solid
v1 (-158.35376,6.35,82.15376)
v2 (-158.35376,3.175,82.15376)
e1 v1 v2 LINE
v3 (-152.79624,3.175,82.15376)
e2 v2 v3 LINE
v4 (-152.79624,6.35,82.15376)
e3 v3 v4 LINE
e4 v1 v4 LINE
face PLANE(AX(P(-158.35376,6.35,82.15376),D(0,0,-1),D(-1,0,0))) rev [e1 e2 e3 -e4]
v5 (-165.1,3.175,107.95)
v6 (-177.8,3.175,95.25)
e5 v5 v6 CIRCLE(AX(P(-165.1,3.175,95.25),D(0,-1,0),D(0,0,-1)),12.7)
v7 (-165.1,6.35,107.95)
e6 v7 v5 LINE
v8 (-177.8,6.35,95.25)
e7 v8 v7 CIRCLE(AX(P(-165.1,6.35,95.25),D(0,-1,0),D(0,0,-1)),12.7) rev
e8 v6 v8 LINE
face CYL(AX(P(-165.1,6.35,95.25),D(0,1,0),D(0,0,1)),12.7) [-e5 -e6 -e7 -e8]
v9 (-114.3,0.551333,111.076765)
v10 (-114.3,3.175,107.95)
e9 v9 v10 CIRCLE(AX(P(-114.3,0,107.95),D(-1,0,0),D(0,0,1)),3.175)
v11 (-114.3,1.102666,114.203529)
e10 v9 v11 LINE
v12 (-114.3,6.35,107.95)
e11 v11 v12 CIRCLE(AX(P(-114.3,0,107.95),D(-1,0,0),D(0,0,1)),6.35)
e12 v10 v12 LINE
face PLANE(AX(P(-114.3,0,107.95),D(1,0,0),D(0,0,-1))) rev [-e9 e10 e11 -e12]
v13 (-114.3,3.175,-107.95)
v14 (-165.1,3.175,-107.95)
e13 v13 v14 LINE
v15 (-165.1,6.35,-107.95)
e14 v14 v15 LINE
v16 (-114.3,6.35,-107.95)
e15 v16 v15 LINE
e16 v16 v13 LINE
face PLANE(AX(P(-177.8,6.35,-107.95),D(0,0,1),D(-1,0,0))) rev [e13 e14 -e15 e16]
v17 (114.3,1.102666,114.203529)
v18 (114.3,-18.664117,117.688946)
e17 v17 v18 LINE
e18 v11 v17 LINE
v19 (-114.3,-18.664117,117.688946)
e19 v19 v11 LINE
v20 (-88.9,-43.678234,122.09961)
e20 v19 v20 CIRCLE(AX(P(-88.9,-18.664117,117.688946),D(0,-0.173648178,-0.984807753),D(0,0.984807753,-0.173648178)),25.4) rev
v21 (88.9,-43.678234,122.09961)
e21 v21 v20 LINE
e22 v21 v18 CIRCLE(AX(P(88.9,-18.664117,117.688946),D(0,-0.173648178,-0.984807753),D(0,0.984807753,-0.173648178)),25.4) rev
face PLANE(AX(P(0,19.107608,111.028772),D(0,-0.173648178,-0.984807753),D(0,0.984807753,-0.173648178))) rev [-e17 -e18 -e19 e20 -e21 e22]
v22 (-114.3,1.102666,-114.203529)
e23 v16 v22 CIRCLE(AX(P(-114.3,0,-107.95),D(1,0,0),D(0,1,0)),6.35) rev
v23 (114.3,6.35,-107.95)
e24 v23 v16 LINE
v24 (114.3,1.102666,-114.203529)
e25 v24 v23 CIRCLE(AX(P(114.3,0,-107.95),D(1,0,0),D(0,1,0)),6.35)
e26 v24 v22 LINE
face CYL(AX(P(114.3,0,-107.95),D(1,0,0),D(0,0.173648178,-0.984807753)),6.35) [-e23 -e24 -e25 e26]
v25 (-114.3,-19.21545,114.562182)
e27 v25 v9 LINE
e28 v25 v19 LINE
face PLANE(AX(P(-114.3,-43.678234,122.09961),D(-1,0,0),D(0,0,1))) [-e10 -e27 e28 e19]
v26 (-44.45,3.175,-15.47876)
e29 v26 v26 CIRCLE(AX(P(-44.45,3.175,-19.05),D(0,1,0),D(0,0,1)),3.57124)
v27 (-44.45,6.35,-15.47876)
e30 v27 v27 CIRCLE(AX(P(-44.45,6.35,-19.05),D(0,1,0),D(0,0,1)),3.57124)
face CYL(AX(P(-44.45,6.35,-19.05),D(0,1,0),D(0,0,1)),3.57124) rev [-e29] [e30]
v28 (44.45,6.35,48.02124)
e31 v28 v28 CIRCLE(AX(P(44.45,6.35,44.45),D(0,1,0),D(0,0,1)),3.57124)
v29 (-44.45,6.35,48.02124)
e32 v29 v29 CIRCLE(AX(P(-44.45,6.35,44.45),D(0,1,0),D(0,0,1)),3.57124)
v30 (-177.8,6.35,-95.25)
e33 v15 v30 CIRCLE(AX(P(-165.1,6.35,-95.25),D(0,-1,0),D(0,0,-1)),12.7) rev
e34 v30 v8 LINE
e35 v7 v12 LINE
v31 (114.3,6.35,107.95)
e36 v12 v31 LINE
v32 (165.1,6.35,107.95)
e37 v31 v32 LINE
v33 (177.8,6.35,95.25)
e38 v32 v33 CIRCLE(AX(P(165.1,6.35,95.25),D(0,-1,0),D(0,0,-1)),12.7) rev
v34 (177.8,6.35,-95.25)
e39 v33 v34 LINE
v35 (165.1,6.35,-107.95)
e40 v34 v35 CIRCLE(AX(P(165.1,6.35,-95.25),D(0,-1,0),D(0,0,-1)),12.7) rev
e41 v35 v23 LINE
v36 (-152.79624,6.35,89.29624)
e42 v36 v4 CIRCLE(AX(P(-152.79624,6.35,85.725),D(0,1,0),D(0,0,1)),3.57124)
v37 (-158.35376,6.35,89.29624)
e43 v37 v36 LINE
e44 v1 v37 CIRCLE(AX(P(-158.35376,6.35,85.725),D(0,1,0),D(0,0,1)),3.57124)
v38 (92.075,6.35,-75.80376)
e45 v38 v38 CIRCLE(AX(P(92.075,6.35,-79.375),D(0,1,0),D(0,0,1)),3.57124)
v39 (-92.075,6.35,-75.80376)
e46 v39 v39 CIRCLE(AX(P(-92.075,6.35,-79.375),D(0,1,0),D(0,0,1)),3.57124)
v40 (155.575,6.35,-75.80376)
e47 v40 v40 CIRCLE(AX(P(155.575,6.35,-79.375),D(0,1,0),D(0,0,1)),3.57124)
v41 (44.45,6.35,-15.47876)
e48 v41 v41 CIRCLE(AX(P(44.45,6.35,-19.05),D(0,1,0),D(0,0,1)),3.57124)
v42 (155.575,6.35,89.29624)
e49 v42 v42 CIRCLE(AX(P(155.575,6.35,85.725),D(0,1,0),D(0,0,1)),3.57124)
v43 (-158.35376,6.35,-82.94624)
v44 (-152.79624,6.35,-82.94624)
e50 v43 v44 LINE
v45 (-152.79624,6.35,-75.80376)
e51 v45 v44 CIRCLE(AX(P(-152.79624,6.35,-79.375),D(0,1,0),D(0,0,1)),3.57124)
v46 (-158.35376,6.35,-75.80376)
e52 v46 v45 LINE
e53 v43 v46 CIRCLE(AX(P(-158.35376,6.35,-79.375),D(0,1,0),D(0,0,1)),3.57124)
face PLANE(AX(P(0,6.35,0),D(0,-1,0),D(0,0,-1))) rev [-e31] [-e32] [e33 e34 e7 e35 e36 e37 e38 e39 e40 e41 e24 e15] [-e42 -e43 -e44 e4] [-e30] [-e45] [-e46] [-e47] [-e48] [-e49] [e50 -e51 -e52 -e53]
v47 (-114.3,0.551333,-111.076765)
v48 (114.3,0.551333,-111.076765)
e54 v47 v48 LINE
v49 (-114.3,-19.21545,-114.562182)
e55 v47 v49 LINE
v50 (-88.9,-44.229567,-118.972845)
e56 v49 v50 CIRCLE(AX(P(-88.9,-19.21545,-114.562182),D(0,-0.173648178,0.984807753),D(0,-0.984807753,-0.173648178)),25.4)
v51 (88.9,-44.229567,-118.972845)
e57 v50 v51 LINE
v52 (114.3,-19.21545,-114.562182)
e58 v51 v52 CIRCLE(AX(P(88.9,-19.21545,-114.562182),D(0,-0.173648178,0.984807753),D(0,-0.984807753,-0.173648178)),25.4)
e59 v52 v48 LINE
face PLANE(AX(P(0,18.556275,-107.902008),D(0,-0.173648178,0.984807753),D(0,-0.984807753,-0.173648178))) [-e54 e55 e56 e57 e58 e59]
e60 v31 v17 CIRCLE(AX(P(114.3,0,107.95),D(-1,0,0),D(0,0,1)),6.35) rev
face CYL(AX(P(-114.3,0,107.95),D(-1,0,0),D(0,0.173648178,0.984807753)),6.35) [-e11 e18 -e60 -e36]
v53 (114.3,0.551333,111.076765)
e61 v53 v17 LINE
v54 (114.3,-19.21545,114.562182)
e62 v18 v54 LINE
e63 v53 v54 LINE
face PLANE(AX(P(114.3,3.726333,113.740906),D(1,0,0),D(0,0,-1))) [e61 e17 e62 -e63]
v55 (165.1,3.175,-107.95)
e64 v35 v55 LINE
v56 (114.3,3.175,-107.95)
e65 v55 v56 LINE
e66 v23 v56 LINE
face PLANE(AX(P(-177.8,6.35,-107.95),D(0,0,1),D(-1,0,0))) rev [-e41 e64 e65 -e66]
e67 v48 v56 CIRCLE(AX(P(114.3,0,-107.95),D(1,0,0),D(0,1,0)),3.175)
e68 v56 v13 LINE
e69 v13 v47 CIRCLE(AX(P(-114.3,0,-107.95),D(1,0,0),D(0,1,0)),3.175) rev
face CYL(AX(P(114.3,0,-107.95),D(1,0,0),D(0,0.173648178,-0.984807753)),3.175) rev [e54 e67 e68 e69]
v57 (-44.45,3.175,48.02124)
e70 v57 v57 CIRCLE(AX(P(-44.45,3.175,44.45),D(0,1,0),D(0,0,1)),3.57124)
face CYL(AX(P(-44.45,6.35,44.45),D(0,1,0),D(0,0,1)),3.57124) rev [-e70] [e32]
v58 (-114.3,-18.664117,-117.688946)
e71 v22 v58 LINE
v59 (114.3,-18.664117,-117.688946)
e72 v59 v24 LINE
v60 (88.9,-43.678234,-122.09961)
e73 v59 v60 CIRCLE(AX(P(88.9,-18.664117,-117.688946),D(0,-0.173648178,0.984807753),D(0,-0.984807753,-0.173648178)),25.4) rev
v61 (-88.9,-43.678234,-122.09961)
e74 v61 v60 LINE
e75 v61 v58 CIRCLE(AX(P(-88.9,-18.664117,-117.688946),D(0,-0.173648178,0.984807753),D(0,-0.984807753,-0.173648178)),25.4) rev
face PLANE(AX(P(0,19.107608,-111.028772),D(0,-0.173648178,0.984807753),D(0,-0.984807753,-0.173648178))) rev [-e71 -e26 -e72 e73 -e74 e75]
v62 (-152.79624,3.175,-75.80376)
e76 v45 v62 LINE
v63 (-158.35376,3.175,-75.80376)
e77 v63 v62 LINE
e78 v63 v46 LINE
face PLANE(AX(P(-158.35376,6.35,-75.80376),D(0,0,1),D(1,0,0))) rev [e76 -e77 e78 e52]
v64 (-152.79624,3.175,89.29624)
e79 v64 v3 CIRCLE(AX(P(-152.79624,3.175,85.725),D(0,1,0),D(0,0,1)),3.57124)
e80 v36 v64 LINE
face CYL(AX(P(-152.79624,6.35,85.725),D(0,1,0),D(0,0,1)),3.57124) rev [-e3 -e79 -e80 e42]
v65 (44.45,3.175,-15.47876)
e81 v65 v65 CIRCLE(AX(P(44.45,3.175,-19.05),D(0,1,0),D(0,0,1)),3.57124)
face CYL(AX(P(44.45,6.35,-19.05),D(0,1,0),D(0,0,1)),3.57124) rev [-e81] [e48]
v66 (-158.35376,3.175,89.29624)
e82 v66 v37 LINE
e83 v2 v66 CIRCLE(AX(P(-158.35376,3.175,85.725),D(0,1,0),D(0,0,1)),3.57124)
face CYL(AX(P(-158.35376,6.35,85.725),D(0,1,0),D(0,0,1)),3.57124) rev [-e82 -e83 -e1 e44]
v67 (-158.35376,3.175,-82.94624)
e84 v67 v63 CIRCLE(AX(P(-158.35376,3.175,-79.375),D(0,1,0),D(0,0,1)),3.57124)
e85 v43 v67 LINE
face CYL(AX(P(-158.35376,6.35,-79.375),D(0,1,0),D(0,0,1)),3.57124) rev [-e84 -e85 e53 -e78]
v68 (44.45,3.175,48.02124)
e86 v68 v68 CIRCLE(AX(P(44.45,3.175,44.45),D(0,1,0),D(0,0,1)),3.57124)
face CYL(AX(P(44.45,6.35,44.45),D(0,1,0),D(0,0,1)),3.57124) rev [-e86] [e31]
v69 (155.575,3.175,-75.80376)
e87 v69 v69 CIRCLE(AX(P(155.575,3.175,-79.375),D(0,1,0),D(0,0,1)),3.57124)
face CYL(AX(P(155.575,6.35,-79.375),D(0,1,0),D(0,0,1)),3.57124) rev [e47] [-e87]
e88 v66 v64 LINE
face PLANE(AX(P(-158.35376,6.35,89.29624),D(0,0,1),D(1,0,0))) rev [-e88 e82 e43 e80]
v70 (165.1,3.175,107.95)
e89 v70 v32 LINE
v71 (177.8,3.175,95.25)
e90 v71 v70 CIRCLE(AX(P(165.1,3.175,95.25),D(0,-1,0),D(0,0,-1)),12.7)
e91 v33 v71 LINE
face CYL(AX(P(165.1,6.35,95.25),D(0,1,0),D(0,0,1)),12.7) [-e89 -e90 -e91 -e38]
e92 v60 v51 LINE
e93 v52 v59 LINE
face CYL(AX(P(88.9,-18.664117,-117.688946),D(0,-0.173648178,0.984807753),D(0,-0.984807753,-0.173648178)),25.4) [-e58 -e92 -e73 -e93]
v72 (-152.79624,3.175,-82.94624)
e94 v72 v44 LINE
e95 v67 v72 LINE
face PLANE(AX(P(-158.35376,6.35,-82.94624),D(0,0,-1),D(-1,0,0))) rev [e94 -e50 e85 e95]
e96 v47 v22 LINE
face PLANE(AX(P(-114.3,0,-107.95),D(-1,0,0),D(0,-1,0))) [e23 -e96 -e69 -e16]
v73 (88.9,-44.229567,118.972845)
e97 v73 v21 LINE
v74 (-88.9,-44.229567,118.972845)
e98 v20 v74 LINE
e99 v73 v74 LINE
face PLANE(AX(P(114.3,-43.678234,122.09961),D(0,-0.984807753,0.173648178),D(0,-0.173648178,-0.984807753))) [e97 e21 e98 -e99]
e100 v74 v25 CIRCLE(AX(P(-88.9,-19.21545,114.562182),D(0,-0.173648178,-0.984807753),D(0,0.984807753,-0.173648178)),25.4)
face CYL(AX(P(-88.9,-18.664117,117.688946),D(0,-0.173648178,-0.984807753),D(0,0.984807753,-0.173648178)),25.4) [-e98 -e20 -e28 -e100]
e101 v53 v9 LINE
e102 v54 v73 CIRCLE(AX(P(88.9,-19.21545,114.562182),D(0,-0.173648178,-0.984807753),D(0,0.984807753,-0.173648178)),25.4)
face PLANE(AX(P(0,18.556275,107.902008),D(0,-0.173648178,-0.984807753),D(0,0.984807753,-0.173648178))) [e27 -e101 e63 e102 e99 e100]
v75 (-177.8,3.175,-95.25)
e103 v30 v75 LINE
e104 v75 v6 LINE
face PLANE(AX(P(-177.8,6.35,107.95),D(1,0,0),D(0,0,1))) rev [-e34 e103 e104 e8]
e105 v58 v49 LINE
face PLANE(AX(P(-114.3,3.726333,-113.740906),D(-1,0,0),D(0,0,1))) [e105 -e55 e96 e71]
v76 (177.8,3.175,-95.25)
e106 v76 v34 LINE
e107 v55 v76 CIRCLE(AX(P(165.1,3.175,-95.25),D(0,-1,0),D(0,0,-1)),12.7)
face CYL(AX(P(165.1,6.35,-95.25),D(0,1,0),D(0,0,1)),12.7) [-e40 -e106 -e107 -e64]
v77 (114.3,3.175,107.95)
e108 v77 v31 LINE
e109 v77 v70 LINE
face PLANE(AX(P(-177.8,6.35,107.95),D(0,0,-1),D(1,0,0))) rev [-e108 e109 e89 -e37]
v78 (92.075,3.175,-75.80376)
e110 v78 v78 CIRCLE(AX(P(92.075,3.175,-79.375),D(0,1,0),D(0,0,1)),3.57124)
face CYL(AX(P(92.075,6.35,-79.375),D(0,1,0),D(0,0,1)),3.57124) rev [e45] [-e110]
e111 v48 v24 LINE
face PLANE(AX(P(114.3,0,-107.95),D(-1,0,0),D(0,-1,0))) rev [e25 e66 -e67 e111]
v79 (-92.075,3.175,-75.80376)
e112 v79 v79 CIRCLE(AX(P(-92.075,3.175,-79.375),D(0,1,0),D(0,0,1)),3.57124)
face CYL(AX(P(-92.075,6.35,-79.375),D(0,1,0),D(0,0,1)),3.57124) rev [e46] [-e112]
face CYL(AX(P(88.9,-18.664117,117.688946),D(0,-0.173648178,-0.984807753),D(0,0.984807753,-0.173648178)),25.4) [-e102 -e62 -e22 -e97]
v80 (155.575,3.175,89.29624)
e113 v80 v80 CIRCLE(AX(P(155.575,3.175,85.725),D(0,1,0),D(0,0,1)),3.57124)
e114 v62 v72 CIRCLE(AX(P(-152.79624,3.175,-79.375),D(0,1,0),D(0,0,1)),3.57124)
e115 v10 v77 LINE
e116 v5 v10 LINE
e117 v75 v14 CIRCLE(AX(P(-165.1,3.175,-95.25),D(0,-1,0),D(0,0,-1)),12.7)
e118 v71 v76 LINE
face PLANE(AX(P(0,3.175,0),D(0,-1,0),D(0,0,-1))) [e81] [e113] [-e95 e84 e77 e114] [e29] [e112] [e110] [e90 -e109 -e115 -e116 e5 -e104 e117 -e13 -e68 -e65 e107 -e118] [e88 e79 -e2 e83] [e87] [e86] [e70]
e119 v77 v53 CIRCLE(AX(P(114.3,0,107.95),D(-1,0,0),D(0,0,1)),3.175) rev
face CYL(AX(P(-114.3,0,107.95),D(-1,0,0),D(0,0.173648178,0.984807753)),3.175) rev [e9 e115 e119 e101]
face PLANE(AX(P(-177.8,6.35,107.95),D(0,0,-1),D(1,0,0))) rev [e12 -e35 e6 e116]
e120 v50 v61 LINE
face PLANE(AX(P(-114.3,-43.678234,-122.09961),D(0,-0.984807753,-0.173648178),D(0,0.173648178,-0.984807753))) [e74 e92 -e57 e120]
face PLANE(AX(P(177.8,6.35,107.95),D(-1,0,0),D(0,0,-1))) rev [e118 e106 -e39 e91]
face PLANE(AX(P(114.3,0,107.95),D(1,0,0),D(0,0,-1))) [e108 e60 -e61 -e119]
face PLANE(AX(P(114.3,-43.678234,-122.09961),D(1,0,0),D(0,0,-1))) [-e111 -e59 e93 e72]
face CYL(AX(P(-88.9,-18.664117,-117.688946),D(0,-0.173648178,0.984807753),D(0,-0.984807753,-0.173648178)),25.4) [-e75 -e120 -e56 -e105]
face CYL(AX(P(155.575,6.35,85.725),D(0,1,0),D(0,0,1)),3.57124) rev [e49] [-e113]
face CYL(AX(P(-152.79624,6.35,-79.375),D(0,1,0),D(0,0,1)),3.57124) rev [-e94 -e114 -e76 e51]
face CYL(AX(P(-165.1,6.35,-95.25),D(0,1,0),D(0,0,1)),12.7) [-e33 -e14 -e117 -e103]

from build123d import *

# Parameters (mm, degrees)
SKETCH1_W                   = 355.6
SKETCH1_H                   = 215.9
BOSS_EXTRUDE1_DEPTH         = 6.35
CONVERT_SOLID1_OUTLINE_W    = 355.6
CONVERT_SOLID1_OUTLINE_H    = 215.9
CONVERT_SOLID1_DEPTH        = 3.175
F_1_4_CLEARANCE_HOLE1_D     = 7.14248
F_1_4_START                 = 3.175
F_1_4_CLEARANCE_SLOT1_DEPTH = 3.175
EDGE_FLANGE2_DEPTH          = 228.6
EDGE_FLANGE2_BEND_DEPTH     = 228.6
FILLET1_R                   = 12.7
FILLET2_R                   = 25.4


# Read off the part's stored shape, not the designer's step: Convert-Solid1, 1/4 Clearance Slot1
# Sheet-metal steps are written as plain solids
with BuildPart() as part:
    # Sketch1 → Boss-Extrude1 (new body)
    with BuildSketch(Plane(origin=(0, 0, 0), x_dir=(1, 0, 0), z_dir=(0, 1, 0))):
        Rectangle(SKETCH1_W, SKETCH1_H)
    extrude(amount=BOSS_EXTRUDE1_DEPTH)

    # Convert-Solid1 outline → Convert-Solid1 (cut)
    with BuildSketch(Plane(origin=(0, 0, 0), x_dir=(1, 0, 0), z_dir=(0, 1, 0))):
        Rectangle(CONVERT_SOLID1_OUTLINE_W, CONVERT_SOLID1_OUTLINE_H)
    extrude(amount=CONVERT_SOLID1_DEPTH, mode=Mode.SUBTRACT)

    # 1/4 Clearance Hole1 (through all)
    with Locations(Plane(origin=(0, 6.35, 0), x_dir=(1, 0, 0), z_dir=(0, 1, 0))):
        with Locations((-92.075, 79.375), (-44.45, 19.05), (44.45, 19.05), (-44.45, -44.45), (44.45, -44.45), (92.075, 79.375), (155.575, 79.375), (155.575, -85.725)):
            Hole(F_1_4_CLEARANCE_HOLE1_D / 2)

    # 1/4 Clearance Slot1 outline → 1/4 Clearance Slot1 (cut)
    with BuildSketch(Plane(origin=(0, 0, 0), x_dir=(1, 0, 0), z_dir=(0, 1, 0)).offset(F_1_4_START)):
        with BuildLine():
            Line((-158.35376, -89.29624), (-152.79624, -89.29624))
            ThreePointArc((-152.79624, -89.29624), (-149.225, -85.725), (-152.79624, -82.15376))
            Line((-152.79624, -82.15376), (-158.35376, -82.15376))
            ThreePointArc((-158.35376, -82.15376), (-161.925, -85.725), (-158.35376, -89.29624))
        make_face()
        with BuildLine():
            Line((-158.35376, 75.80376), (-152.79624, 75.80376))
            ThreePointArc((-152.79624, 75.80376), (-149.225, 79.375), (-152.79624, 82.94624))
            Line((-152.79624, 82.94624), (-158.35376, 82.94624))
            ThreePointArc((-158.35376, 82.94624), (-161.925, 79.375), (-158.35376, 75.80376))
        make_face()
    extrude(amount=F_1_4_CLEARANCE_SLOT1_DEPTH, mode=Mode.SUBTRACT)

    # Edge-Flange2 section (across the edge) → Edge-Flange2 (add)
    with BuildSketch(Plane(origin=(-114.3, 3.175, -110.614141329), x_dir=(0, -0.17364817766693427, 0.9848077530122075), z_dir=(1, 0, 0))):
        with BuildLine():
            Line((-3.175, 2.664141329), (-3.175, 48.135858671))
            Line((-3.175, 48.135858671), (0, 48.135858671))
            Line((0, 48.135858671), (0, 2.664141329))
            ThreePointArc((0, 2.664141329), (0.742808893, 0.623290668), (2.623667036, -0.462623287))
            Line((2.623667036, -0.462623287), (2.072334072, -3.589387903))
            ThreePointArc((2.072334072, -3.589387903), (-1.689382214, -1.417559993), (-3.175, 2.664141329))
        make_face()
    extrude(amount=EDGE_FLANGE2_DEPTH)

    # Edge-Flange2 section 2 (across the edge) → Edge-Flange2 bend (add)
    with BuildSketch(Plane(origin=(114.3, 3.175, 110.614141329), x_dir=(0, -0.17364817766693427, -0.9848077530122075), z_dir=(-1, 0, 0))):
        with BuildLine():
            Line((-3.175, 2.664141329), (-3.175, 48.135858671))
            Line((-3.175, 48.135858671), (0, 48.135858671))
            Line((0, 48.135858671), (0, 2.664141329))
            ThreePointArc((0, 2.664141329), (0.742808893, 0.623290668), (2.623667036, -0.462623287))
            Line((2.623667036, -0.462623287), (2.072334072, -3.589387903))
            ThreePointArc((2.072334072, -3.589387903), (-1.689382214, -1.417559993), (-3.175, 2.664141329))
        make_face()
    extrude(amount=EDGE_FLANGE2_BEND_DEPTH)

    # Fillet1
    fillet1_edges = [part.edges().sort_by_distance(p)[0] for p in [
        (177.8, 4.7625, -107.95),
        (177.8, 4.7625, 107.95),
        (-177.8, 4.7625, 107.95),
        (-177.8, 4.7625, -107.95),
    ]]
    fillet(fillet1_edges, radius=FILLET1_R)

    # Fillet2
    fillet2_edges = [part.edges().sort_by_distance(p)[0] for p in [
        (-114.3, -43.953900335, -120.536227776),
        (114.3, -43.953900335, -120.536227776),
        (114.3, -43.953900335, 120.536227776),
        (-114.3, -43.953900335, 120.536227776),
    ]]
    fillet(fillet2_edges, radius=FILLET2_R)


solid = part.part
